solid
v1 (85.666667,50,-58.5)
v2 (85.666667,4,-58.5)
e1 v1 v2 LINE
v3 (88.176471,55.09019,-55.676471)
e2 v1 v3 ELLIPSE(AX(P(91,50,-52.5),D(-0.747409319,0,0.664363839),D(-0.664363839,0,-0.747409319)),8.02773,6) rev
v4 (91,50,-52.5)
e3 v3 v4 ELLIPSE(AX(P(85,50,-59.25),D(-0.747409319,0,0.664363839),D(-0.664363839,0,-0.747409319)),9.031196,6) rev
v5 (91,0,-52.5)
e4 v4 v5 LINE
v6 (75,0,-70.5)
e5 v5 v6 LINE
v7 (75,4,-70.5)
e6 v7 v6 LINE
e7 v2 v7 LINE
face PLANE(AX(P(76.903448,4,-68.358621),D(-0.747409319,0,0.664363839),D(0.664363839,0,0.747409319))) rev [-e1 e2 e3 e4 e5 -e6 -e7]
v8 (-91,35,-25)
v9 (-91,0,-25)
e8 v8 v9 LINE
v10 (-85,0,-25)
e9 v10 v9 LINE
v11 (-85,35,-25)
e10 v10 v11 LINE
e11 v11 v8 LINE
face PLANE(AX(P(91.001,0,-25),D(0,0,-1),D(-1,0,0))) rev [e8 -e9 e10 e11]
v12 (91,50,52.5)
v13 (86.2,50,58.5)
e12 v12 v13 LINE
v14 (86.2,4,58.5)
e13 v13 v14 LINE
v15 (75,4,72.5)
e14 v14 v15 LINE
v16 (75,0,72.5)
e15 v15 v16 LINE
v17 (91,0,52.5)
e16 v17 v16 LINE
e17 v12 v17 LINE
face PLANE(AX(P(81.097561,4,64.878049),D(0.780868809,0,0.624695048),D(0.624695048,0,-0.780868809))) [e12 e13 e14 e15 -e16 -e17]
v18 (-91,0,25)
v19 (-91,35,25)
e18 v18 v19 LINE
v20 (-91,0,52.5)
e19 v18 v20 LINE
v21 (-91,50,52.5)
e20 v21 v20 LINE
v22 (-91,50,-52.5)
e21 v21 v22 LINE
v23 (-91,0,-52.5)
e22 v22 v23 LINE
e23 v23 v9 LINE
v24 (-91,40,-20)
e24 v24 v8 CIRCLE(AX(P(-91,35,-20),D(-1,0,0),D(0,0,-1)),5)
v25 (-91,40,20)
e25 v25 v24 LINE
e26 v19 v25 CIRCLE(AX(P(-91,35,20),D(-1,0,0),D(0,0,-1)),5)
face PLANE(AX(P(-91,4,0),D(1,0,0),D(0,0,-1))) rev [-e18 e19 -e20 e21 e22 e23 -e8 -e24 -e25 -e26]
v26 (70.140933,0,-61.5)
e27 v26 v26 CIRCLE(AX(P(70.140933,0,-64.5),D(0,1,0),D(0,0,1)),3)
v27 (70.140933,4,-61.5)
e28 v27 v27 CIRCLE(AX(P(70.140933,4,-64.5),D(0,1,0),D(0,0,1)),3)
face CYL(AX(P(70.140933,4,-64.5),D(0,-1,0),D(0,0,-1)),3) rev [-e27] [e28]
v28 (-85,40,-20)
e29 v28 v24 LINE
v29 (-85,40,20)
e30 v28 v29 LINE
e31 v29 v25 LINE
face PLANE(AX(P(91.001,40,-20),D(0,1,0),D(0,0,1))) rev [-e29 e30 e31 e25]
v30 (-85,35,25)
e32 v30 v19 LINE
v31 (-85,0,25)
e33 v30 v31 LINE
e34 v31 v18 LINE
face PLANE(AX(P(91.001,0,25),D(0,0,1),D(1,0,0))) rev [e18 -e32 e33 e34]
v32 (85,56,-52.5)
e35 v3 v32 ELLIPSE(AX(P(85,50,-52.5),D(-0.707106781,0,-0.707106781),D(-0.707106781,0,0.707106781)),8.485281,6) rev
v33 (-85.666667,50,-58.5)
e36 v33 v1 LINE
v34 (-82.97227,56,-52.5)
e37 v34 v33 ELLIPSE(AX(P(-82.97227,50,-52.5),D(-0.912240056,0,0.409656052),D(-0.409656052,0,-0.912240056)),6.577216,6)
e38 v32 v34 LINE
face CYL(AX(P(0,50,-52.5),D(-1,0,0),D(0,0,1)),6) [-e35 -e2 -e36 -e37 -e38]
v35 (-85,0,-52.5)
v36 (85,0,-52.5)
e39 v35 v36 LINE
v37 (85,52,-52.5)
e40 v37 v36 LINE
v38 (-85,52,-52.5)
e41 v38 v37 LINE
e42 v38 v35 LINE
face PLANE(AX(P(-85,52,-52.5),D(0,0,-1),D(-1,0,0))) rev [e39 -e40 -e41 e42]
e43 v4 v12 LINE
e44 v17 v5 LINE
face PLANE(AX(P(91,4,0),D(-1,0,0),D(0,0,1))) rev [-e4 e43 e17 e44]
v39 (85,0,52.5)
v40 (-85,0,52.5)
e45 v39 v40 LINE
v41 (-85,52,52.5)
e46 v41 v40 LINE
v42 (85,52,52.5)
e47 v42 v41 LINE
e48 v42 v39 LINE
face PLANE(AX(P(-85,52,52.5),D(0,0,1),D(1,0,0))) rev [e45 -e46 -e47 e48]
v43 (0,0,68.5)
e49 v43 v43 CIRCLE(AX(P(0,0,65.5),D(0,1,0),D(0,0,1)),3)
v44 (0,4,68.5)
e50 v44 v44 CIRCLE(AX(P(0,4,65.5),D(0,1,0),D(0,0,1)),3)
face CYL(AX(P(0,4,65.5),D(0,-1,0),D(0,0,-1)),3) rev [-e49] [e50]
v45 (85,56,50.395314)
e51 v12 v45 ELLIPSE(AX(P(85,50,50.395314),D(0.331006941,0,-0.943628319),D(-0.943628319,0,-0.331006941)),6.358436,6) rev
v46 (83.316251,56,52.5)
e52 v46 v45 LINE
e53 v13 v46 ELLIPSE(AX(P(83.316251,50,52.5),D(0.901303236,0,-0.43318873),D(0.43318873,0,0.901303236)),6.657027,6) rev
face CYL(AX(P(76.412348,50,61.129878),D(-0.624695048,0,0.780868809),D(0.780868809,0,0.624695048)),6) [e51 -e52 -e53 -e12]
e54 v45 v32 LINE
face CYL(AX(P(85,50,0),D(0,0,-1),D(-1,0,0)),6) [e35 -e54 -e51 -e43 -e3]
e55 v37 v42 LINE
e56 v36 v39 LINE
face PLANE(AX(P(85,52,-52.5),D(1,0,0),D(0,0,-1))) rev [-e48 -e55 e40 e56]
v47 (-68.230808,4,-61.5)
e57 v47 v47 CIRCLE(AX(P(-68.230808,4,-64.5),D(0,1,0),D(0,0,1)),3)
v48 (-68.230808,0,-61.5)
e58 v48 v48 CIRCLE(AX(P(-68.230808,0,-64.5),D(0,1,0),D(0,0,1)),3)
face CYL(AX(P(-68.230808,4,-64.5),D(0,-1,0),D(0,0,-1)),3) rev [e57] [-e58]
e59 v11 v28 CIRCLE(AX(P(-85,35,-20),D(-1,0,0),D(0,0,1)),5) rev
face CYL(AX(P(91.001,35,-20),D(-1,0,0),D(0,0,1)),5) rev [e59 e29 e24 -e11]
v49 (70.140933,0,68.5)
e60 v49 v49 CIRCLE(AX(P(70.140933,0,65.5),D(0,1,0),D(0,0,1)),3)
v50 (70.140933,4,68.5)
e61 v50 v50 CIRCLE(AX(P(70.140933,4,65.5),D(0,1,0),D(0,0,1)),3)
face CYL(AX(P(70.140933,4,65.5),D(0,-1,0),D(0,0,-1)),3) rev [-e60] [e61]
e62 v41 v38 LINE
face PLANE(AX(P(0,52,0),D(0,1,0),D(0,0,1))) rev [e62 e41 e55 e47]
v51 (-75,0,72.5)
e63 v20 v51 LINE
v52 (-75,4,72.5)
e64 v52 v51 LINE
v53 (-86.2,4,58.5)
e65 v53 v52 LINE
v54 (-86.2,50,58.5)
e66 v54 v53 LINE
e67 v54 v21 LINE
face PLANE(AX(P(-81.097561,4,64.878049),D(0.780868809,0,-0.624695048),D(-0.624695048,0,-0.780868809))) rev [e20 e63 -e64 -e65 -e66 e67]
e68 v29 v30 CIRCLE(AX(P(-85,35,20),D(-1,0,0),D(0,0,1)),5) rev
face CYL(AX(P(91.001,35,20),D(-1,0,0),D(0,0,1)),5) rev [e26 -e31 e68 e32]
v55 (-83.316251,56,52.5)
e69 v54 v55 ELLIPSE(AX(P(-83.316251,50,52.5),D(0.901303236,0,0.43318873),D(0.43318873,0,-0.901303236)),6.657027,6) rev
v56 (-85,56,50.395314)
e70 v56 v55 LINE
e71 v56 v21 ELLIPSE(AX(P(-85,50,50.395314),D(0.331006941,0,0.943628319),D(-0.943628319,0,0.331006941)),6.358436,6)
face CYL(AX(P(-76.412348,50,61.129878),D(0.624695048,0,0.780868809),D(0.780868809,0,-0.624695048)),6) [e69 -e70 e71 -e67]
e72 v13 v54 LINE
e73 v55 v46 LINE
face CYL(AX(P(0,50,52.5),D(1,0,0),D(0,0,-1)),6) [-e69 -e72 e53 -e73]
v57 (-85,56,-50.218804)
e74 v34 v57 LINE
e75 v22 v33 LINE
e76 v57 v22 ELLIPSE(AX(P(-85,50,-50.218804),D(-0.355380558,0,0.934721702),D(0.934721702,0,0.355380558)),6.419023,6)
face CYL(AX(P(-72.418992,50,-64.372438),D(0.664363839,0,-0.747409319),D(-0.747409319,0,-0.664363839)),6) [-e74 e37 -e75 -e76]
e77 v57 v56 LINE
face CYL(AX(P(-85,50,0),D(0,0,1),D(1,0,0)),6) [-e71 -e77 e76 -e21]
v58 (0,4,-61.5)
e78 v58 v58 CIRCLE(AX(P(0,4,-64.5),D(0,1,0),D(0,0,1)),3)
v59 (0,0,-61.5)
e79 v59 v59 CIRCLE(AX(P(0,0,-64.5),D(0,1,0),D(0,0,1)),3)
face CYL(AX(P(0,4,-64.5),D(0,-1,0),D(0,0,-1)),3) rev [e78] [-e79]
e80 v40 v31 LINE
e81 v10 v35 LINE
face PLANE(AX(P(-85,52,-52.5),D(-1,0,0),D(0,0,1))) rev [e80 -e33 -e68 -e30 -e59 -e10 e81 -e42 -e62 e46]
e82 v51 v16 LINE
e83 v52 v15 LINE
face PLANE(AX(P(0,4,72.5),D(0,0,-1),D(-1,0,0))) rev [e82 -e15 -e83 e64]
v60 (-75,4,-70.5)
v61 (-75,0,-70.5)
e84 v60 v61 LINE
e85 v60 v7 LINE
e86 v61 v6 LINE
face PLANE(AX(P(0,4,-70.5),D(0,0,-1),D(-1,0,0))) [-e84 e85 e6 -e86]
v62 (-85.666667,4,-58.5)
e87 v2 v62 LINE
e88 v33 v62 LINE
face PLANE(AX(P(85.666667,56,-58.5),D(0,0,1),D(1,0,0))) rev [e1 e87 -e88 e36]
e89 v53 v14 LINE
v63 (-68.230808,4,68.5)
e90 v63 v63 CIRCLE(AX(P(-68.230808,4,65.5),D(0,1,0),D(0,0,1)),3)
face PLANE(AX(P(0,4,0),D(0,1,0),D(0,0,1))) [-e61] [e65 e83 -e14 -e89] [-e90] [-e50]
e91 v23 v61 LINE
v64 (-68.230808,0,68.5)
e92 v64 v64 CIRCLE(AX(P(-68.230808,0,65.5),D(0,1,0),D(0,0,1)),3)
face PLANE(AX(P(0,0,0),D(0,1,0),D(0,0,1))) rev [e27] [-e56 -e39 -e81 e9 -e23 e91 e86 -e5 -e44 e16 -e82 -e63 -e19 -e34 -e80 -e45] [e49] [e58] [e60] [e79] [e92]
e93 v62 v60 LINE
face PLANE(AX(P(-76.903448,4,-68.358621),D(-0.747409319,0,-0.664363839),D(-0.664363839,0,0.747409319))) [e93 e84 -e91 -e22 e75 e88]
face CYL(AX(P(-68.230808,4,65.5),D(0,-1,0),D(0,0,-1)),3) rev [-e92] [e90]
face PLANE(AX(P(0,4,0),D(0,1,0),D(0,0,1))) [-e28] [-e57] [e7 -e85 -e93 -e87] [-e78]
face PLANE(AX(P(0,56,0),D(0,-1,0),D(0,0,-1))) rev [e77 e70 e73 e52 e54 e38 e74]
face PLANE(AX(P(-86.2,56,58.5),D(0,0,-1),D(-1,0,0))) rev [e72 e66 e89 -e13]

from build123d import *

# Parameters (mm, degrees)
SKETCH_1_R          = 3
EXTRUDE_3_DEPTH     = 4
EXTRUDE_5_DEPTH     = 52
SKETCH_4_W          = 170
SKETCH_4_H          = 105
CUT_EXTRUDE_1_DEPTH = 52
FILLET_1_R          = 6
CUT_EXTRUDE_2_REACH = 205.755


with BuildPart() as part:
    # 草图1 → 凸台-拉伸3 (new body)
    with BuildSketch(Plane(origin=(0, 0, 0), x_dir=(1, 0, 0), z_dir=(0, 1, 0))):
        Polygon((-75, 70.5), (75, 70.5), (91, 52.5), (91, -52.5), (75, -72.5), (-75, -72.5), (-91, -52.5), (-91, 52.5), align=None)
        with Locations(Location((0, 64.5, 0), (0, 0, 270))):
            Circle(SKETCH_1_R, mode=Mode.SUBTRACT)
        with Locations(Location((-68.230807573, 64.5, 0), (0, 0, 270))):
            Circle(SKETCH_1_R, mode=Mode.SUBTRACT)
        with Locations(Location((70.140932989, 64.5, 0), (0, 0, 270))):
            Circle(SKETCH_1_R, mode=Mode.SUBTRACT)
        with Locations(Location((0, -65.5, 0), (0, 0, 270))):
            Circle(SKETCH_1_R, mode=Mode.SUBTRACT)
        with Locations(Location((70.140932989, -65.5, 0), (0, 0, 270))):
            Circle(SKETCH_1_R, mode=Mode.SUBTRACT)
        with Locations(Location((-68.230807573, -65.5, 0), (0, 0, 270))):
            Circle(SKETCH_1_R, mode=Mode.SUBTRACT)
    extrude(amount=EXTRUDE_3_DEPTH)

    # 草图3 → 凸台-拉伸5 (add)
    with BuildSketch(Plane(origin=(0, 4, 0), x_dir=(1, 0, 0), z_dir=(0, 1, 0))):
        Polygon((-91, 52.5), (-91, -52.5), (-86.2, -58.5), (86.2, -58.5), (91, -52.5), (91, 52.5), (85.666666667, 58.5), (-85.666666667, 58.5), align=None)
    extrude(amount=EXTRUDE_5_DEPTH)

    # 草图4 → 切除-拉伸1 (cut)
    with BuildSketch(Plane.XZ):
        Rectangle(SKETCH_4_W, SKETCH_4_H)
    extrude(amount=-CUT_EXTRUDE_1_DEPTH, mode=Mode.SUBTRACT)

    # 圆角1
    # the kernel refuses this fillet: 6 mm, written as the material it takes off along each edge
    with BuildSketch(Plane(origin=(-100.370425713, 56, 40.786967858), x_dir=(0.7808688094430221, 0, -0.6246950475544346), z_dir=(0.6246950475544346, 0, 0.7808688094430221)), Plane(origin=(76.829574287, 56, 70.213032142), x_dir=(-0.7808688094430356, 0, -0.6246950475544176), z_dir=(0.6246950475544177, 0, -0.7808688094430356))) as fillet_1_piece_1:
        with BuildLine():
            CenterArc((FILLET_1_R, -FILLET_1_R), FILLET_1_R, 90, 90)
            Line((0, -FILLET_1_R), (0, 0))
            Line((0, 0), (FILLET_1_R, 0))
        make_face()
    extrude(amount=37.683749085, mode=Mode.SUBTRACT)
    with BuildSketch(Plane(origin=(-75.701209084, 56, -69.71113978), x_dir=(0, -1, 0), z_dir=(-0.6643638388299179, 0, 0.7474093186836614))) as fillet_1_piece_2:
        with BuildLine():
            CenterArc((FILLET_1_R, FILLET_1_R), FILLET_1_R, 180, 90)
            Line((0, FILLET_1_R), (0, 0))
            Line((0, 0), (FILLET_1_R, 0))
        make_face()
    extrude(amount=38.027729719, mode=Mode.SUBTRACT)
    with BuildSketch(Plane(origin=(100.666666667, 56, -58.5), x_dir=(0, 0, 1), z_dir=(-1, 0, 0))) as fillet_1_piece_3:
        with BuildLine():
            CenterArc((FILLET_1_R, -FILLET_1_R), FILLET_1_R, 90, 90)
            Line((0, -FILLET_1_R), (0, 0))
            Line((0, 0), (FILLET_1_R, 0))
        make_face()
    extrude(amount=201.333333333, mode=Mode.SUBTRACT)
    with BuildSketch(Plane(origin=(91, 56, 67.5), x_dir=(-1, 0, 0), z_dir=(0, 0, -1))) as fillet_1_piece_4:
        with BuildLine():
            CenterArc((FILLET_1_R, -FILLET_1_R), FILLET_1_R, 90, 90)
            Line((0, -FILLET_1_R), (0, 0))
            Line((0, 0), (FILLET_1_R, 0))
        make_face()
    extrude(amount=135, mode=Mode.SUBTRACT)
    with BuildSketch(Plane(origin=(-91, 56, -67.5), x_dir=(0, -1, 0), z_dir=(0, 0, 1))) as fillet_1_piece_5:
        with BuildLine():
            CenterArc((FILLET_1_R, FILLET_1_R), FILLET_1_R, 180, 90)
            Line((0, FILLET_1_R), (0, 0))
            Line((0, 0), (FILLET_1_R, 0))
        make_face()
    extrude(amount=135, mode=Mode.SUBTRACT)
    with BuildSketch(Plane(origin=(-101.2, 56, 58.5), x_dir=(0, 0, -1), z_dir=(1, 0, 0))) as fillet_1_piece_6:
        with BuildLine():
            CenterArc((FILLET_1_R, -FILLET_1_R), FILLET_1_R, 90, 90)
            Line((0, -FILLET_1_R), (0, 0))
            Line((0, 0), (FILLET_1_R, 0))
        make_face()
    extrude(amount=202.4, mode=Mode.SUBTRACT)

    # 草图5 → 切除-拉伸2 (cut, up to next)
    with BuildSketch(Plane.ZY.offset(91), mode=Mode.PRIVATE) as cut_extrude_2_sk1:
        with BuildLine():
            Line((-25, 0), (25, 0))
            Line((25, 0), (25, 35))
            ThreePointArc((25, 35), (23.535533906, 38.535533906), (20, 40))
            Line((20, 40), (-20, 40))
            ThreePointArc((-20, 40), (-23.535533906, 38.535533906), (-25, 35))
            Line((-25, 35), (-25, 0))
        make_face()
    cut_extrude_2_tool1 = extrude(cut_extrude_2_sk1.sketch, amount=-CUT_EXTRUDE_2_REACH, mode=Mode.PRIVATE) & part.part
    add(cut_extrude_2_tool1.solids().sort_by_distance((-91, 19.898145, 0))[0], mode=Mode.SUBTRACT)


solid = part.part
